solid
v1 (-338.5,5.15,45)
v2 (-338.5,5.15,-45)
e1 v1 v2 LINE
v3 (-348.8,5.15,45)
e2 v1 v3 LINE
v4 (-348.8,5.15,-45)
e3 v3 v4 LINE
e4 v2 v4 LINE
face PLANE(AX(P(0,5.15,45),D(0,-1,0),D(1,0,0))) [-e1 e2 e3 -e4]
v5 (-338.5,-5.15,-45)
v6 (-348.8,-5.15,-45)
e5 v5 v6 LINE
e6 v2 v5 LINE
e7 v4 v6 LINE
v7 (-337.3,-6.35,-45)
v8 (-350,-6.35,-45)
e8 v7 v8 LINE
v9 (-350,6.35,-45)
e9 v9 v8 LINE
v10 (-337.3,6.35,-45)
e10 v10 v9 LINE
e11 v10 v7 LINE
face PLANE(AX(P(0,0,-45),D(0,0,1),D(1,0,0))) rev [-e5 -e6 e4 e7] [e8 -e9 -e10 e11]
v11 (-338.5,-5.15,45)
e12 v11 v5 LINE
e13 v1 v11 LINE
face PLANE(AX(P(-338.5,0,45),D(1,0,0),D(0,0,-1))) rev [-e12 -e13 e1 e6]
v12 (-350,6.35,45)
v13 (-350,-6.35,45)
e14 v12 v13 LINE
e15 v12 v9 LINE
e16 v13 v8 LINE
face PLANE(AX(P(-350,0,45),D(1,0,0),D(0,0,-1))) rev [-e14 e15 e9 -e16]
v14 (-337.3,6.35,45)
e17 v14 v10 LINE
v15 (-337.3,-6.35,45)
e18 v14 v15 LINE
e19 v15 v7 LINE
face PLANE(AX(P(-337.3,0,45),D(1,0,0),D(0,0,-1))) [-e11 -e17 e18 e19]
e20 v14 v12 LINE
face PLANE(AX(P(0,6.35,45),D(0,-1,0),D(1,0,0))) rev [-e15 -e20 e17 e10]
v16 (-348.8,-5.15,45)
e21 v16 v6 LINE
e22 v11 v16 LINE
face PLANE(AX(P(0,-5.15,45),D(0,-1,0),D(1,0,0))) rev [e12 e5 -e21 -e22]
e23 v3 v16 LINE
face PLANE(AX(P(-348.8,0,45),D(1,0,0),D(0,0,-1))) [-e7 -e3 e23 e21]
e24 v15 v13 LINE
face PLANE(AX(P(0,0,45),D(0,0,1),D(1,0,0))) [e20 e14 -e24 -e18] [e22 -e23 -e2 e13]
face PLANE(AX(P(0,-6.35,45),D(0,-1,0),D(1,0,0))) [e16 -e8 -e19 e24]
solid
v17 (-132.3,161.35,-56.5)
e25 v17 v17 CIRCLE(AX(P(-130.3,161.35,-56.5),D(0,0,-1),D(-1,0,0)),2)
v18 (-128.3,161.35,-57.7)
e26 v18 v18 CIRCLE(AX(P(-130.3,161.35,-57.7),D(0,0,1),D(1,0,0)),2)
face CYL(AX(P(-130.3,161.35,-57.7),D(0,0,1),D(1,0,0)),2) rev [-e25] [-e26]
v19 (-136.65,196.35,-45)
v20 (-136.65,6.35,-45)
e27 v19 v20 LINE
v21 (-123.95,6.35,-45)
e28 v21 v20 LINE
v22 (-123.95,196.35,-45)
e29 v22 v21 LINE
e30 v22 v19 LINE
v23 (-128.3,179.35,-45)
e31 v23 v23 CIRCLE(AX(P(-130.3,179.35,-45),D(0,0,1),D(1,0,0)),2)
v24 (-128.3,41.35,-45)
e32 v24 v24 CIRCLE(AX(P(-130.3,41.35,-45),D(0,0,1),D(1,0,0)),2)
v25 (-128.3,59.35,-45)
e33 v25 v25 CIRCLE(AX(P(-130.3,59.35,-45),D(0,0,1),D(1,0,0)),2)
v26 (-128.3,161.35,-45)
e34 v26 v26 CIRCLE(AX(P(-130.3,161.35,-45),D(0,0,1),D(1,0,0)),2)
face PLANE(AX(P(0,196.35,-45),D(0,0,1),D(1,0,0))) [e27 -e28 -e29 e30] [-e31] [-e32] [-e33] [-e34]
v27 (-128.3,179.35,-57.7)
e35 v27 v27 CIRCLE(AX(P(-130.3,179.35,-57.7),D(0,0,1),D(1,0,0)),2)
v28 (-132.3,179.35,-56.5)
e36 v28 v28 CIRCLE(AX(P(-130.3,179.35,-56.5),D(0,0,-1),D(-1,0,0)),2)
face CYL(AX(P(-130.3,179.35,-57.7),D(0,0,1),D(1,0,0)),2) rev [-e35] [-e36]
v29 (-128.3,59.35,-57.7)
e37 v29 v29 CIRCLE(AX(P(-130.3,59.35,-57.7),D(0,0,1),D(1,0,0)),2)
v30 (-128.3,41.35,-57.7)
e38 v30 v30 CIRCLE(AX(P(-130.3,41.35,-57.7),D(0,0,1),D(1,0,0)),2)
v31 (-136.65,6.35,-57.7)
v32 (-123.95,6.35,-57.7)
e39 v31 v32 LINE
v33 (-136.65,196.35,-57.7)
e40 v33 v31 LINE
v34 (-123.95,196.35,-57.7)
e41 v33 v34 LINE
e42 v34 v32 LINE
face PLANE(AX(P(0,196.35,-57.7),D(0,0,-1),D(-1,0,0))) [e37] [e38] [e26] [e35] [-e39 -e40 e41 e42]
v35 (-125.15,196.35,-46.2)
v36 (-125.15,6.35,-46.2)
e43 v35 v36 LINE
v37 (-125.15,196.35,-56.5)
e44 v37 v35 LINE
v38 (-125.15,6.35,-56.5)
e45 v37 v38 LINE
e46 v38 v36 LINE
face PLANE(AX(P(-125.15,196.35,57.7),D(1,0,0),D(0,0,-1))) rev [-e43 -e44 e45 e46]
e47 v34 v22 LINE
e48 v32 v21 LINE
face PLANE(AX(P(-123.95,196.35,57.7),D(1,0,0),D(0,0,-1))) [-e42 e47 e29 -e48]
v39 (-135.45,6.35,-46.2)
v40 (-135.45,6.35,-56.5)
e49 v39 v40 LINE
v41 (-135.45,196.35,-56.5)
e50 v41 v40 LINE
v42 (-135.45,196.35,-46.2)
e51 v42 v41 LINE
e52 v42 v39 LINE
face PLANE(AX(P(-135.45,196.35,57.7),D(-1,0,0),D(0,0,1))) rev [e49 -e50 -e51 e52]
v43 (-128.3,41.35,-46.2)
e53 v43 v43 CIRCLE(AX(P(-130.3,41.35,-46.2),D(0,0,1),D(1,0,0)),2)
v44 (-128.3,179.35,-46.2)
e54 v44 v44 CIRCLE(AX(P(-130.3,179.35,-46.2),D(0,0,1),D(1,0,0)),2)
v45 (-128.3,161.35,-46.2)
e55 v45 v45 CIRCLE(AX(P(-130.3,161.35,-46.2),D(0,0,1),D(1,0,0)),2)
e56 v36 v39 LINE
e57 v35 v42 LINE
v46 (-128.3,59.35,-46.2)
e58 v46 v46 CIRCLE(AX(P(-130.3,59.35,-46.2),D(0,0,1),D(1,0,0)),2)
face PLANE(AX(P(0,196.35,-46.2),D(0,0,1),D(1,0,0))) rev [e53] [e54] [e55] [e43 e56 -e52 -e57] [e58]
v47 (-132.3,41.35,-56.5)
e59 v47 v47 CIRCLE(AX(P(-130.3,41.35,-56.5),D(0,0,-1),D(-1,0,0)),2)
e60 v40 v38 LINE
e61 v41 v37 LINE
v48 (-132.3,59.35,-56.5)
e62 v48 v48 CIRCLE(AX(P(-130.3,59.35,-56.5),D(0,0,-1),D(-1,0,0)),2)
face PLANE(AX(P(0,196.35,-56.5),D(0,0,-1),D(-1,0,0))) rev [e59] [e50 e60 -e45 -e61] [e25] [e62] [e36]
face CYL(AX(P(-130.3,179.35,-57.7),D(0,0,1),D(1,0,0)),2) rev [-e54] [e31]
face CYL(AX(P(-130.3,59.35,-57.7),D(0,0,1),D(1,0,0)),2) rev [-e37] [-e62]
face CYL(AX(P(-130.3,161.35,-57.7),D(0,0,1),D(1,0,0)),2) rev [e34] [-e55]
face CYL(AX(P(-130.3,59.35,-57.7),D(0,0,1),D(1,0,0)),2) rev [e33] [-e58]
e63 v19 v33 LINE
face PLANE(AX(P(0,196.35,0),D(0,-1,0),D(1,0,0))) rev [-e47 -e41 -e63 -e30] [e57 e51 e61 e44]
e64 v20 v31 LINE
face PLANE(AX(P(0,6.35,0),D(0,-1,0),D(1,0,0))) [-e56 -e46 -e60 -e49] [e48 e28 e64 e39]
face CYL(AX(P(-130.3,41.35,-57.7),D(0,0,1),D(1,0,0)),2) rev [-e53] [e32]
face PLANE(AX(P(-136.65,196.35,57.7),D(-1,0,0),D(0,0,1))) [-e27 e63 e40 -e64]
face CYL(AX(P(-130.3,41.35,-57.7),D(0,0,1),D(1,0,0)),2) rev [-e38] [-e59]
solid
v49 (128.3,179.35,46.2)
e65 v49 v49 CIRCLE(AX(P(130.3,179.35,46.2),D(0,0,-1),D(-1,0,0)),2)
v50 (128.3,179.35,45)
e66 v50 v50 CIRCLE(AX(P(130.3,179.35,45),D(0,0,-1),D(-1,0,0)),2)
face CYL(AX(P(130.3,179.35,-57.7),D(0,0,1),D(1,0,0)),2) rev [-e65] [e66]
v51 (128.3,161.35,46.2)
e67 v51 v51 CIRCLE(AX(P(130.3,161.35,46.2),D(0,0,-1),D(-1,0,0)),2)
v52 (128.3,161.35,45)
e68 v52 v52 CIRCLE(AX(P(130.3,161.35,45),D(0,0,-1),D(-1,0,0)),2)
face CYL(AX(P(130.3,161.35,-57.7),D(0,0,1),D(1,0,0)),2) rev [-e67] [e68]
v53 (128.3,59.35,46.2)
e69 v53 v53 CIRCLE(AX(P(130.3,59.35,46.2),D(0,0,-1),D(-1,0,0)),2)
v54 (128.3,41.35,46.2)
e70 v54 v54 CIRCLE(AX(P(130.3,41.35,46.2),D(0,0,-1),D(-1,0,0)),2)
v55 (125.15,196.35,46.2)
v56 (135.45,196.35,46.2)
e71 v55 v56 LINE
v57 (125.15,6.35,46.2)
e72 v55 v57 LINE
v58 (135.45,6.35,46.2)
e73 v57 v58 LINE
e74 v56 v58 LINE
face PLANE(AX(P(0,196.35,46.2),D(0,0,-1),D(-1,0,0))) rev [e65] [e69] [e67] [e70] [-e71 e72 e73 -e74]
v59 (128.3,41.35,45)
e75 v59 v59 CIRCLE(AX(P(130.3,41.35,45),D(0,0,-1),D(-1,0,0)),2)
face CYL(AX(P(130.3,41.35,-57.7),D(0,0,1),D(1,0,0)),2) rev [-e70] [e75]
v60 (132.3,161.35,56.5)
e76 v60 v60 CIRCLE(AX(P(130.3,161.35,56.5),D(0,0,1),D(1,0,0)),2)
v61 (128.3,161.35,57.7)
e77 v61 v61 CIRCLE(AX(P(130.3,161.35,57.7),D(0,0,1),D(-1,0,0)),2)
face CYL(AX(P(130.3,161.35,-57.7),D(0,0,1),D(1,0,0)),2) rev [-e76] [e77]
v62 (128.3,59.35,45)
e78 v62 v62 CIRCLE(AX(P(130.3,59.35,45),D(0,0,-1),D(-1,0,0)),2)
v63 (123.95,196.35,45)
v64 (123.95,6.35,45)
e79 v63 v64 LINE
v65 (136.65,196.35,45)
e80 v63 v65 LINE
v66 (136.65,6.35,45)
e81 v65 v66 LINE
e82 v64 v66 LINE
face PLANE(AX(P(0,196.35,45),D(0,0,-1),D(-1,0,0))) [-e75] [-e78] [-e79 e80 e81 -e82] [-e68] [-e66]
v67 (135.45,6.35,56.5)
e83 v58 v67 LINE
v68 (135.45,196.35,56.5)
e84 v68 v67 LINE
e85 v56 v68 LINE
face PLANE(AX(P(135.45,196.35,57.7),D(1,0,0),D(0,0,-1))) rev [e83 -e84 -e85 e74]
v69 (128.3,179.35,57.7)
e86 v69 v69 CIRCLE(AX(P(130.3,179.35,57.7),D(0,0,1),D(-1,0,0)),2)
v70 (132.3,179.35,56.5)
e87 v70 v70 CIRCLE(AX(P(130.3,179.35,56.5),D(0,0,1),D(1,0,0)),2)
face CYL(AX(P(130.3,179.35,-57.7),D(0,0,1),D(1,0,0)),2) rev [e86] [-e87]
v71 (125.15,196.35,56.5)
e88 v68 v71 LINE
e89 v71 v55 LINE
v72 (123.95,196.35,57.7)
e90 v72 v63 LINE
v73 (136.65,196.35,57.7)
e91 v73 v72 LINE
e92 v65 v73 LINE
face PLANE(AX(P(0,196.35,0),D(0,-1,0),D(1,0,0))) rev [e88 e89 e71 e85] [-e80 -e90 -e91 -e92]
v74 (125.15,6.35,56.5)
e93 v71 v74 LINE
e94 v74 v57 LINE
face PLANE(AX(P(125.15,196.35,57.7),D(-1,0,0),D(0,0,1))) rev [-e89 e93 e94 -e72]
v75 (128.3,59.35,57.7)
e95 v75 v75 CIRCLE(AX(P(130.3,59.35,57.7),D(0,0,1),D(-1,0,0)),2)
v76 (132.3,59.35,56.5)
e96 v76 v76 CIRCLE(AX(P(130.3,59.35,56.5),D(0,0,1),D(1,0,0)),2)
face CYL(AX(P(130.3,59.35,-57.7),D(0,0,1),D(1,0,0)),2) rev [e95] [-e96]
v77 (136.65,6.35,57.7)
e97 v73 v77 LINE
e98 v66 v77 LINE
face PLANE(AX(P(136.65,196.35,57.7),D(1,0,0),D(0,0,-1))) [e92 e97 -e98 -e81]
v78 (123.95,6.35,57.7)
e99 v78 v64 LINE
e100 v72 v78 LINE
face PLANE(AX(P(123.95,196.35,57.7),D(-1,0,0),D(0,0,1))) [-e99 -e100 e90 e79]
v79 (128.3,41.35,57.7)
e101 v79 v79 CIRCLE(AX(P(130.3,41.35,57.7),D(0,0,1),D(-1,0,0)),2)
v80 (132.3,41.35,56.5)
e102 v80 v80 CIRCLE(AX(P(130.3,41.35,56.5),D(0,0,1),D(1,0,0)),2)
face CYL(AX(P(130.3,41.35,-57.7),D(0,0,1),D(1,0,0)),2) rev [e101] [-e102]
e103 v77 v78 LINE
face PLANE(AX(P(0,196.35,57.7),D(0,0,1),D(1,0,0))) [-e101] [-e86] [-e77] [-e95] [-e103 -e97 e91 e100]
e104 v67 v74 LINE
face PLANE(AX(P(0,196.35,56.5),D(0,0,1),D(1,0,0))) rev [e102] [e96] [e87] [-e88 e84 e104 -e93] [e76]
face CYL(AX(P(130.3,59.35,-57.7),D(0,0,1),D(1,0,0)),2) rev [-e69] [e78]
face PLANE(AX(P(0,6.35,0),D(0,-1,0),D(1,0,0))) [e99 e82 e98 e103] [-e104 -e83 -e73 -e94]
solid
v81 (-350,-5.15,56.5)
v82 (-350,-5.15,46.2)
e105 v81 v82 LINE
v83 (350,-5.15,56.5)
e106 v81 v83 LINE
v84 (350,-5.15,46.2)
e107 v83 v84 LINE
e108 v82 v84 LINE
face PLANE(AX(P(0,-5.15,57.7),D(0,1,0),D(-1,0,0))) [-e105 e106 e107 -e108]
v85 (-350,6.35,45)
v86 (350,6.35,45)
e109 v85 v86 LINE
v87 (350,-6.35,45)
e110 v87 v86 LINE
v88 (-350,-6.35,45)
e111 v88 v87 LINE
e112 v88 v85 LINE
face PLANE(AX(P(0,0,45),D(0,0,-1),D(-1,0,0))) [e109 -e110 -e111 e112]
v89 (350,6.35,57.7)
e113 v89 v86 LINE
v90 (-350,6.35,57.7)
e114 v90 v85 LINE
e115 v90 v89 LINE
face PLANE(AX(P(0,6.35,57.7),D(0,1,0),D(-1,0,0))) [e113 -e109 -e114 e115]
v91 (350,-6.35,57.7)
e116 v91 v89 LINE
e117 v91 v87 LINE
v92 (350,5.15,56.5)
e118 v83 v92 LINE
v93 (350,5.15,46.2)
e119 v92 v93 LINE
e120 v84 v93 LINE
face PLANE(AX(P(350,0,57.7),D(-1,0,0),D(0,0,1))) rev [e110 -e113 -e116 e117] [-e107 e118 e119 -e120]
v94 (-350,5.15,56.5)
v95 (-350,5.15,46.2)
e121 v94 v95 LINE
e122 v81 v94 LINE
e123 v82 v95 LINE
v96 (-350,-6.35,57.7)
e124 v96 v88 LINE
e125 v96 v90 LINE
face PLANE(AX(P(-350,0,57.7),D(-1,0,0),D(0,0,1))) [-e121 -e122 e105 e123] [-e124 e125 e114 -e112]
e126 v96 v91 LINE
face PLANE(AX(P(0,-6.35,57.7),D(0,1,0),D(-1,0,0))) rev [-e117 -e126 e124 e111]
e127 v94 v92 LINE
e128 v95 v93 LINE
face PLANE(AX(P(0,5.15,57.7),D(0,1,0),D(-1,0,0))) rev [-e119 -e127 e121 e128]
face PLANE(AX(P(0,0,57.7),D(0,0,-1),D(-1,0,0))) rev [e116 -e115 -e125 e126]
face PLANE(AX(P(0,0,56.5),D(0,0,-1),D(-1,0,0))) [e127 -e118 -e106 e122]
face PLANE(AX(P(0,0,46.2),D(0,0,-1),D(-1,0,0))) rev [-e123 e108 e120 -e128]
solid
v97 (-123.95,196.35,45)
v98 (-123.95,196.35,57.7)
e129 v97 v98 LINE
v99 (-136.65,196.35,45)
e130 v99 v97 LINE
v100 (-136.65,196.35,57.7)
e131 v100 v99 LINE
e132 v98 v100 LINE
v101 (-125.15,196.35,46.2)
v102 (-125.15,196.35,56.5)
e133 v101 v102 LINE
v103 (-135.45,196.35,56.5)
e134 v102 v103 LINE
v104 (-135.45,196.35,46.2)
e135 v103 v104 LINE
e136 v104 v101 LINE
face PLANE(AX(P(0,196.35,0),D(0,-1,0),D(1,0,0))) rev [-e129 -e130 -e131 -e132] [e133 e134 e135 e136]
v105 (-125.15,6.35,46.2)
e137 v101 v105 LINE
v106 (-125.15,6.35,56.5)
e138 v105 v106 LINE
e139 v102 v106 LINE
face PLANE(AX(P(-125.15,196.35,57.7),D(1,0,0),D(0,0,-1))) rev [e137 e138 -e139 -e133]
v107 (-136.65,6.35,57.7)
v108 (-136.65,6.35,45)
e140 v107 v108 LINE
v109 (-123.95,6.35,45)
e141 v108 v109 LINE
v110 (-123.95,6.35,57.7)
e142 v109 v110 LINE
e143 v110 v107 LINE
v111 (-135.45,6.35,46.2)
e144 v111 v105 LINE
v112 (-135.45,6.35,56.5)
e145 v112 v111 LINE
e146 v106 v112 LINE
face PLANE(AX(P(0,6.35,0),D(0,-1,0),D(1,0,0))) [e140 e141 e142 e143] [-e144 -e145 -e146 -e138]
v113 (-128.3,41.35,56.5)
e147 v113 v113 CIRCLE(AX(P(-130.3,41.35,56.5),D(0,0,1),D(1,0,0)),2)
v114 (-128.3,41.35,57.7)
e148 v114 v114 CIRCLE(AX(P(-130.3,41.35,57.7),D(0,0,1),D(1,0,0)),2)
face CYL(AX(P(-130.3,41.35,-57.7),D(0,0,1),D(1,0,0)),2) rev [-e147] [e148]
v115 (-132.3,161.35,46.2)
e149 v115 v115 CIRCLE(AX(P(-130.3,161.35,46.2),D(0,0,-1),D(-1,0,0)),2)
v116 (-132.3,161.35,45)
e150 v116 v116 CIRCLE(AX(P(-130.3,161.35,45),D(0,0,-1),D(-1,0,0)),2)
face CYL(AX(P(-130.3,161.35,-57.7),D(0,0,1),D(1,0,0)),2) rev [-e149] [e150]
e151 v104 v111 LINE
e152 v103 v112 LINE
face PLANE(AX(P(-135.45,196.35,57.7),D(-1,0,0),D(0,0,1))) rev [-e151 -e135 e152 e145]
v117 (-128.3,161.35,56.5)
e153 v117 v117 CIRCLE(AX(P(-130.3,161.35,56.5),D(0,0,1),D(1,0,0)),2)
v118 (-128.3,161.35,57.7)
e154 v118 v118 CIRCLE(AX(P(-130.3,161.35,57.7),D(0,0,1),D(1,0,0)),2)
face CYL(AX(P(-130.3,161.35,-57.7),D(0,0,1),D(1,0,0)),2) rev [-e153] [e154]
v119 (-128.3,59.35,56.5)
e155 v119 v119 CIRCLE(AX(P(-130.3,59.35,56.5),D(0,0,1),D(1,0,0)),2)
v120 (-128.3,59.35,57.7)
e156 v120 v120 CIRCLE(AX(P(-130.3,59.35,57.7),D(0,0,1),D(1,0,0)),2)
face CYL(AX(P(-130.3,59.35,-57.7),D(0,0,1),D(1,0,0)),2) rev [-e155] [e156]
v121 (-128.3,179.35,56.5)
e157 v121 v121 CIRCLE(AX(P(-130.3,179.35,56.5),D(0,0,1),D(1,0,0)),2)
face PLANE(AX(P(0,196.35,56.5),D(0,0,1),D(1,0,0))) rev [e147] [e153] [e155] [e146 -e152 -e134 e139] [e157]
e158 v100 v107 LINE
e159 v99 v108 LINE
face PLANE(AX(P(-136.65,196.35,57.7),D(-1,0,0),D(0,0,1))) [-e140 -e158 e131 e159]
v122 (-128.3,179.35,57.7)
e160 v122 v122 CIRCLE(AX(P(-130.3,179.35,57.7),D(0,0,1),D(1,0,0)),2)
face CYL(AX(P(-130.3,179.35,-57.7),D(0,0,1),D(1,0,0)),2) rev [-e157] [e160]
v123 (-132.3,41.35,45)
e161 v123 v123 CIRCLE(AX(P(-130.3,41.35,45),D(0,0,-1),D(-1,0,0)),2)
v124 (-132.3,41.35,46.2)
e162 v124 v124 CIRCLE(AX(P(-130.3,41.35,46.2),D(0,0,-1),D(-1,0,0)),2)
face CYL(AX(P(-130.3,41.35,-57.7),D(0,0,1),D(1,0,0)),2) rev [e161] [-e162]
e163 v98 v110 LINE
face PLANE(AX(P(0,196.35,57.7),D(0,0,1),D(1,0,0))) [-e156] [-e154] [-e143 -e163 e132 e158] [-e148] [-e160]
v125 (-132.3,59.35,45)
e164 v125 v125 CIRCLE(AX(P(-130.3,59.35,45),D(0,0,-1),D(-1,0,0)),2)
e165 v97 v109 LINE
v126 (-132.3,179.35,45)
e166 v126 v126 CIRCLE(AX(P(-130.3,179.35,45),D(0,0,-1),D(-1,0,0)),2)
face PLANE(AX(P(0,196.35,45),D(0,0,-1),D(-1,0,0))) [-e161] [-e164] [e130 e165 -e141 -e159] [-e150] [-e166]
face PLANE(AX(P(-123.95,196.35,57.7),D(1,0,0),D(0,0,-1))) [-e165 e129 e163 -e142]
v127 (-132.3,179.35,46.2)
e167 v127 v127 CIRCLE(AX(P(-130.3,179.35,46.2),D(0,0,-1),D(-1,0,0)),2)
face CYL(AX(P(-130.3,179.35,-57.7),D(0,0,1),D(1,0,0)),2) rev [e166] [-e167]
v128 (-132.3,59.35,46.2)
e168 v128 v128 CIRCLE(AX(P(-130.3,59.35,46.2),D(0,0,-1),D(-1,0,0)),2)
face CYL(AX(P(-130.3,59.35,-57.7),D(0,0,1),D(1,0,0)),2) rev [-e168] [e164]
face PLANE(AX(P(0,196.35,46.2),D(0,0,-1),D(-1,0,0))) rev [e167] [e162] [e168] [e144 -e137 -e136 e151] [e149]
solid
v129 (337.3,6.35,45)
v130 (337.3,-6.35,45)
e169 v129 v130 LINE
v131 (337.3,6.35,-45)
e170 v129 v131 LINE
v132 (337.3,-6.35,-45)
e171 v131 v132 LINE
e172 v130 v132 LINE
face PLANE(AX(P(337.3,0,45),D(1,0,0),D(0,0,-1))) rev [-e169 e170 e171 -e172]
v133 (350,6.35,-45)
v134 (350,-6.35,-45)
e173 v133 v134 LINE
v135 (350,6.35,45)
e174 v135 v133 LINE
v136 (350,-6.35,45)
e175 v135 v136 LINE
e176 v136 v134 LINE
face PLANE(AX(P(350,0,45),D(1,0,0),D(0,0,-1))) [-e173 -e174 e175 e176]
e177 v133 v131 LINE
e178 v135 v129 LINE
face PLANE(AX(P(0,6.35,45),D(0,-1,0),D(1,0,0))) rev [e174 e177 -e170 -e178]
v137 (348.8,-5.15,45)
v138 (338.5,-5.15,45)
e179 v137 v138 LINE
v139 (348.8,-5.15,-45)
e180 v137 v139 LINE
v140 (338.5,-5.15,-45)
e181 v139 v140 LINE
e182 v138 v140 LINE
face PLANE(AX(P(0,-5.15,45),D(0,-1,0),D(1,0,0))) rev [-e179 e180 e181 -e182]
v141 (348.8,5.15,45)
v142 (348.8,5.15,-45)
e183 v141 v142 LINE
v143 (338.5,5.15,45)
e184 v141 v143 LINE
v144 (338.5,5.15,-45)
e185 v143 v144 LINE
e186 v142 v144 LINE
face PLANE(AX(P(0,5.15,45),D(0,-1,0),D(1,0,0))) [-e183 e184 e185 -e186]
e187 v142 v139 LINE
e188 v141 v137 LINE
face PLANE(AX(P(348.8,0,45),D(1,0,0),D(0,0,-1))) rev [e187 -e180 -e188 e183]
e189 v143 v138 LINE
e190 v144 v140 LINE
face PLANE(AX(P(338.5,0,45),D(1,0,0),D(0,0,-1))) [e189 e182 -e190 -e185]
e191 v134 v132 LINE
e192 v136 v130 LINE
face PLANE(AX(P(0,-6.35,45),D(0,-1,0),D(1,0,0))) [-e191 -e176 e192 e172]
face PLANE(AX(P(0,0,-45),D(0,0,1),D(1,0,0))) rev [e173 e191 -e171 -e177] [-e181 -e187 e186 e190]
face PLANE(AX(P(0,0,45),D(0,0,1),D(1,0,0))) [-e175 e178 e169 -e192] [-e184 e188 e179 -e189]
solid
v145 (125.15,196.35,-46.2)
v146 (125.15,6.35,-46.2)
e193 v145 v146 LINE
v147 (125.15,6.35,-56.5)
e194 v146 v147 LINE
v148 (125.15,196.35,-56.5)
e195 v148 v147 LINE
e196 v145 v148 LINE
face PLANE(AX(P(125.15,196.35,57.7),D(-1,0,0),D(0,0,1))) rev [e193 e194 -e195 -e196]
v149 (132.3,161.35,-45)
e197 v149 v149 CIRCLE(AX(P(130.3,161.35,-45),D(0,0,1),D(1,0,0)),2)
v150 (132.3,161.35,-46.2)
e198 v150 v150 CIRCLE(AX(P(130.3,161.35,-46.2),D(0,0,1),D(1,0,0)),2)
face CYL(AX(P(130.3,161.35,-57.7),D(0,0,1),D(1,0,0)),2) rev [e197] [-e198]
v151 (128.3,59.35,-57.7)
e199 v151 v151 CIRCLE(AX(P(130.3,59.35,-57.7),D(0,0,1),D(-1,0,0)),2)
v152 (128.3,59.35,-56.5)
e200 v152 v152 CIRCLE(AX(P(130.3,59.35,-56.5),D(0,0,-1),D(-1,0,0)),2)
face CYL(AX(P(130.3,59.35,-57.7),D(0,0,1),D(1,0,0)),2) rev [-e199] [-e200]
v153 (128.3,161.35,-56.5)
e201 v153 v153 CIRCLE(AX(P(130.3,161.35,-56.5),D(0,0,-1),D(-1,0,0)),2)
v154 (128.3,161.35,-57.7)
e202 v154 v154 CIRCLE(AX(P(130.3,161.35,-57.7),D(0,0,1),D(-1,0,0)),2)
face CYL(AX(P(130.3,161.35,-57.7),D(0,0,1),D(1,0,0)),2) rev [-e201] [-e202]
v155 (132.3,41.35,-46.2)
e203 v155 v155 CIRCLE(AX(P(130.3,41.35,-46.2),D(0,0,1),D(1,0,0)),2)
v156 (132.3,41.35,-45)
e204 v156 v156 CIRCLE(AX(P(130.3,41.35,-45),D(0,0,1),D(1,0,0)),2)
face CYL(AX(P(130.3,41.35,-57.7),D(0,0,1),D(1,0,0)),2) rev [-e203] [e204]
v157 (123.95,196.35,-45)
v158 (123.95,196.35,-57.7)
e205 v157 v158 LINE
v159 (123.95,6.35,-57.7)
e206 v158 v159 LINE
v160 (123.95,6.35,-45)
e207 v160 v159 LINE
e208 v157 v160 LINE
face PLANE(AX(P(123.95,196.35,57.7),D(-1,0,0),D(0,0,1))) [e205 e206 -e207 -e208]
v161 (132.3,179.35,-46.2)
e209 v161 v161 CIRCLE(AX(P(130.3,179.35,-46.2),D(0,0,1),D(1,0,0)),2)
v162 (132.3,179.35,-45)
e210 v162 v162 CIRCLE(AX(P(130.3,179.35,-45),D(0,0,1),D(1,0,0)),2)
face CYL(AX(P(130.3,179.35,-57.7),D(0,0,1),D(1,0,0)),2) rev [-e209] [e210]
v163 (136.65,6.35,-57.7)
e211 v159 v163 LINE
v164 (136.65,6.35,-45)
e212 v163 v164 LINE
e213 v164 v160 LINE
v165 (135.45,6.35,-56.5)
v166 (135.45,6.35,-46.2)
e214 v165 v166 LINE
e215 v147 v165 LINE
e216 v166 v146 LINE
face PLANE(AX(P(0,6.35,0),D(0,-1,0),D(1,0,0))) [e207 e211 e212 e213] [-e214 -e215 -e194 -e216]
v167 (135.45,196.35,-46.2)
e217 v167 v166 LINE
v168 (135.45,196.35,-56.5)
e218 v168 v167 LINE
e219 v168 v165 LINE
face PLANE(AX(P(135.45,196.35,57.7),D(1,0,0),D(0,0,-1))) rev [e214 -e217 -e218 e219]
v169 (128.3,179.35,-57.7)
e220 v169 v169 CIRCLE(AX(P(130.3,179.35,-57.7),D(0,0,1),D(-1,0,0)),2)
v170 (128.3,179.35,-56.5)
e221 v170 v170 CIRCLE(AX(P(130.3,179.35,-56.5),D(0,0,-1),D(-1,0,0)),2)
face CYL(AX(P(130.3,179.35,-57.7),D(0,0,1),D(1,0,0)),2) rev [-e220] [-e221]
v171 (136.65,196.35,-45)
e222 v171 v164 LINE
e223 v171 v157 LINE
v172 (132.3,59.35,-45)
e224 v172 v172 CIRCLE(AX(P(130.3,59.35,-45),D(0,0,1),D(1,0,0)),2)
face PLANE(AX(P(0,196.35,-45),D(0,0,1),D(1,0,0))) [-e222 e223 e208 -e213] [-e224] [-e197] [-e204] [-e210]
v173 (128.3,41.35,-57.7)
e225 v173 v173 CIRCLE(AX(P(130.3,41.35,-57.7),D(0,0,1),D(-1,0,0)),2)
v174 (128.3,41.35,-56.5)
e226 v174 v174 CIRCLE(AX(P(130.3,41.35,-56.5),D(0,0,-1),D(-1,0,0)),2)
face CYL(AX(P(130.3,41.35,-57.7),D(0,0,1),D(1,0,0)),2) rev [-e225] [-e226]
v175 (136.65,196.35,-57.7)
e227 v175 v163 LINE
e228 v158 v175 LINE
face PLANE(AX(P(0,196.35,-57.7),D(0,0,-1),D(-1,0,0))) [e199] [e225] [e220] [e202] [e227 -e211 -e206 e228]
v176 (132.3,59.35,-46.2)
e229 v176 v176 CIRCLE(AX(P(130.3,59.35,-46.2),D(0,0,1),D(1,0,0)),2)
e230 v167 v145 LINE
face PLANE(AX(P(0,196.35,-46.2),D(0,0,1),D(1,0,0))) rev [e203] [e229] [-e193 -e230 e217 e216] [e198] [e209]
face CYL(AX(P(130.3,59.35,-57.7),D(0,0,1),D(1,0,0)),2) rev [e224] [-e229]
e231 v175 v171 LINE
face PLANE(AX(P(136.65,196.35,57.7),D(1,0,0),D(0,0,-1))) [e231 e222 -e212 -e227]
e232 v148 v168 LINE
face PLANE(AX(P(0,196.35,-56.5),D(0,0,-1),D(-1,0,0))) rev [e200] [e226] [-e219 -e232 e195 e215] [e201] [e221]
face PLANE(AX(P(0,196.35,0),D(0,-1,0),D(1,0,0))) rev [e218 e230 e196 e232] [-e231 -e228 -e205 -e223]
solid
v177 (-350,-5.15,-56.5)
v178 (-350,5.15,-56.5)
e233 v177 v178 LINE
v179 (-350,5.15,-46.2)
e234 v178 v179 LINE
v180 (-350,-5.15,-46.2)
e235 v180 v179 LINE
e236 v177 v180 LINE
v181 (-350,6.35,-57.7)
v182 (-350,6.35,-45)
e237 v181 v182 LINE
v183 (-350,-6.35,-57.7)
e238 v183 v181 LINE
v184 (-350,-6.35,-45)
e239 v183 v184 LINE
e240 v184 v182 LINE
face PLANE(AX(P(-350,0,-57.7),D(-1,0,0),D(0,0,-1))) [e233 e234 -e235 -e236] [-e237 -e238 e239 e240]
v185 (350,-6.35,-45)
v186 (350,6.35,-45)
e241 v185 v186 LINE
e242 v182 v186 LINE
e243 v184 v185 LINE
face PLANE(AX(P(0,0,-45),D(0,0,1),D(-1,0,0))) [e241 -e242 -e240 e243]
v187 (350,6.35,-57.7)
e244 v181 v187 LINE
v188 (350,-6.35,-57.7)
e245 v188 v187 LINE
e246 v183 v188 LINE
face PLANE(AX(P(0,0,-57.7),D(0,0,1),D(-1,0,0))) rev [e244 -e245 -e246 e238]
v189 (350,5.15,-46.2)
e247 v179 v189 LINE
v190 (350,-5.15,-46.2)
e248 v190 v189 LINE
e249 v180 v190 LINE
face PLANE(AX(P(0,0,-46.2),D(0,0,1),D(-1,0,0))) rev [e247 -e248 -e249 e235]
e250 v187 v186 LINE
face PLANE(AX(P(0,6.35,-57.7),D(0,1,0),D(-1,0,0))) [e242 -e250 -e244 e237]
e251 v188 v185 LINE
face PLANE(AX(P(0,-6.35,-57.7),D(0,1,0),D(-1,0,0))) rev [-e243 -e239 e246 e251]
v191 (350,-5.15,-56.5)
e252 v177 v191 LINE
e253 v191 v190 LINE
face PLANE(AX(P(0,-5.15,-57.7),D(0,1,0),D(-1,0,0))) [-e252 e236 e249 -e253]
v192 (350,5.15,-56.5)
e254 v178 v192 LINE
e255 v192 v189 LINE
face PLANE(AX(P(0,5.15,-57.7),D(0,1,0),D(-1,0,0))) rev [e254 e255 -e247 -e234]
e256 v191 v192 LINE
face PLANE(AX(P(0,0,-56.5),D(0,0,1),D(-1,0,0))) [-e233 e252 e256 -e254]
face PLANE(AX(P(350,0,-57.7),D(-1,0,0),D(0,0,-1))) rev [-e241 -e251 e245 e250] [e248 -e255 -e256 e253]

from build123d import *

# Parameters (mm, degrees)
SKETCH1_W                 = 12.7
SKETCH1_H                 = 12.7
BOSS_EXTRUDE1_DEPTH       = 45
BOSS_EXTRUDE1_2_DEPTH     = 45
SHELL1_T                  = -1.2
SHELL2_T                  = -1.2
BOSS_EXTRUDE2_START       = 45
SKETCH1_3_W               = 674.6
SKETCH1_3_H               = 12.7
SKETCH1_3_W_2             = 12.7
BOSS_EXTRUDE2_DEPTH       = 12.7
SHELL3_T                  = -1.2
EXTRUDE_THIN1_START       = 6.35
EXTRUDE_THIN1_OUTLINE_W   = 12.7
EXTRUDE_THIN1_OUTLINE_H   = 12.7
EXTRUDE_THIN1_OUTLINE_W_2 = 10.3
EXTRUDE_THIN1_OUTLINE_H_2 = 10.3
EXTRUDE_THIN1_DEPTH       = 190
CUT_EXTRUDE1_DEPTH        = 406.441256534
CUT_EXTRUDE1_DEPTH_BACK   = 406.441256534
SKETCH4_R                 = 2


# Read off the part's stored shape, not the designer's step: Extrude-Thin1
with BuildPart() as part:
    # Sketch1 → Boss-Extrude1 (new, symmetric)
    with BuildSketch(Plane.XY):
        with Locations((-343.65, 0)):
            Rectangle(SKETCH1_W, SKETCH1_H)
    extrude(amount=BOSS_EXTRUDE1_DEPTH, both=True)

    # Shell1
    shell1_openings = [part.faces().sort_by_distance(p)[0] for p in [
        (-343.65, 0, 45),
        (-343.65, 0, -45),
    ]]
    offset(amount=SHELL1_T, openings=shell1_openings, kind=Kind.INTERSECTION)


with BuildPart() as body_2:
    # Sketch1 → Boss-Extrude1 2 (new, symmetric)
    with BuildSketch(Plane.XY):
        with Locations((343.65, 0)):
            Rectangle(SKETCH1_W, SKETCH1_H)
    extrude(amount=BOSS_EXTRUDE1_2_DEPTH, both=True)

    # Shell2
    shell2_openings = [body_2.faces().sort_by_distance(p)[0] for p in [
        (343.65, 0, 45),
        (343.65, 0, -45),
    ]]
    offset(amount=SHELL2_T, openings=shell2_openings, kind=Kind.INTERSECTION)


with BuildPart() as body_3:
    # Sketch1<3> → Boss-Extrude2 (new body)
    with BuildSketch(Plane.XY.offset(BOSS_EXTRUDE2_START)):
        Rectangle(SKETCH1_3_W, SKETCH1_3_H)
        with Locations((-343.65, 0)):
            Rectangle(SKETCH1_3_W_2, SKETCH1_3_H)
        with Locations((343.65, 0)):
            Rectangle(SKETCH1_3_W_2, SKETCH1_3_H)
    extrude(amount=BOSS_EXTRUDE2_DEPTH)

    # Shell3
    shell3_openings = [body_3.faces().sort_by_distance(p)[0] for p in [
        (350, 0, 51.35),
        (-350, 0, 51.35),
    ]]
    offset(amount=SHELL3_T, openings=shell3_openings, kind=Kind.INTERSECTION)


with BuildPart() as body_4:
    # Mirror1: mirrored copy
    add(body_3.part.mirror(Plane.XY))


with BuildPart() as body_5:
    # Extrude-Thin1 outline → Extrude-Thin1 (new body)
    # profile 1 of 4: a face of its own
    with BuildSketch(Plane(origin=(0, 0, 0), x_dir=(1, 0, 0), z_dir=(0, 1, 0)).offset(EXTRUDE_THIN1_START)):
        with Locations((130.3, -51.35)):
            Rectangle(EXTRUDE_THIN1_OUTLINE_W, EXTRUDE_THIN1_OUTLINE_H)
        with Locations((130.3, -51.35)):
            Rectangle(EXTRUDE_THIN1_OUTLINE_W_2, EXTRUDE_THIN1_OUTLINE_H_2, mode=Mode.SUBTRACT)
    # profile 2 of 4: a face of its own
    with BuildSketch(Plane(origin=(0, 0, 0), x_dir=(1, 0, 0), z_dir=(0, 1, 0)).offset(EXTRUDE_THIN1_START)):
        with Locations((-130.3, -51.35)):
            Rectangle(EXTRUDE_THIN1_OUTLINE_W, EXTRUDE_THIN1_OUTLINE_H)
        with Locations((-130.3, -51.35)):
            Rectangle(EXTRUDE_THIN1_OUTLINE_W_2, EXTRUDE_THIN1_OUTLINE_H_2, mode=Mode.SUBTRACT)
    # profile 3 of 4: a face of its own
    with BuildSketch(Plane(origin=(0, 0, 0), x_dir=(1, 0, 0), z_dir=(0, 1, 0)).offset(EXTRUDE_THIN1_START)):
        with Locations((130.3, 51.35)):
            Rectangle(EXTRUDE_THIN1_OUTLINE_W, EXTRUDE_THIN1_OUTLINE_H)
        with Locations((130.3, 51.35)):
            Rectangle(EXTRUDE_THIN1_OUTLINE_W_2, EXTRUDE_THIN1_OUTLINE_H_2, mode=Mode.SUBTRACT)
    # profile 4 of 4: a face of its own
    with BuildSketch(Plane(origin=(0, 0, 0), x_dir=(1, 0, 0), z_dir=(0, 1, 0)).offset(EXTRUDE_THIN1_START)):
        with Locations((-130.3, 51.35)):
            Rectangle(EXTRUDE_THIN1_OUTLINE_W, EXTRUDE_THIN1_OUTLINE_H)
        with Locations((-130.3, 51.35)):
            Rectangle(EXTRUDE_THIN1_OUTLINE_W_2, EXTRUDE_THIN1_OUTLINE_H_2, mode=Mode.SUBTRACT)
    extrude(amount=EXTRUDE_THIN1_DEPTH)

    # Sketch4 → Cut-Extrude1 (cut, two sides: drawn at the far end of the back side and taken through both)
    with BuildSketch(Plane.XY.offset(-CUT_EXTRUDE1_DEPTH_BACK)):
        with Locations((-130.3, 41.35)):
            Circle(SKETCH4_R)
        with Locations((-130.3, 59.35)):
            Circle(SKETCH4_R)
        with Locations((-130.3, 179.35)):
            Circle(SKETCH4_R)
        with Locations((-130.3, 161.35)):
            Circle(SKETCH4_R)
        with Locations((130.3, 161.35)):
            Circle(SKETCH4_R)
        with Locations((130.3, 179.35)):
            Circle(SKETCH4_R)
        with Locations((130.3, 59.35)):
            Circle(SKETCH4_R)
        with Locations((130.3, 41.35)):
            Circle(SKETCH4_R)
    extrude(amount=CUT_EXTRUDE1_DEPTH + CUT_EXTRUDE1_DEPTH_BACK, mode=Mode.SUBTRACT)


solid = Compound([part.part, body_2.part, body_3.part, body_4.part, body_5.part])
